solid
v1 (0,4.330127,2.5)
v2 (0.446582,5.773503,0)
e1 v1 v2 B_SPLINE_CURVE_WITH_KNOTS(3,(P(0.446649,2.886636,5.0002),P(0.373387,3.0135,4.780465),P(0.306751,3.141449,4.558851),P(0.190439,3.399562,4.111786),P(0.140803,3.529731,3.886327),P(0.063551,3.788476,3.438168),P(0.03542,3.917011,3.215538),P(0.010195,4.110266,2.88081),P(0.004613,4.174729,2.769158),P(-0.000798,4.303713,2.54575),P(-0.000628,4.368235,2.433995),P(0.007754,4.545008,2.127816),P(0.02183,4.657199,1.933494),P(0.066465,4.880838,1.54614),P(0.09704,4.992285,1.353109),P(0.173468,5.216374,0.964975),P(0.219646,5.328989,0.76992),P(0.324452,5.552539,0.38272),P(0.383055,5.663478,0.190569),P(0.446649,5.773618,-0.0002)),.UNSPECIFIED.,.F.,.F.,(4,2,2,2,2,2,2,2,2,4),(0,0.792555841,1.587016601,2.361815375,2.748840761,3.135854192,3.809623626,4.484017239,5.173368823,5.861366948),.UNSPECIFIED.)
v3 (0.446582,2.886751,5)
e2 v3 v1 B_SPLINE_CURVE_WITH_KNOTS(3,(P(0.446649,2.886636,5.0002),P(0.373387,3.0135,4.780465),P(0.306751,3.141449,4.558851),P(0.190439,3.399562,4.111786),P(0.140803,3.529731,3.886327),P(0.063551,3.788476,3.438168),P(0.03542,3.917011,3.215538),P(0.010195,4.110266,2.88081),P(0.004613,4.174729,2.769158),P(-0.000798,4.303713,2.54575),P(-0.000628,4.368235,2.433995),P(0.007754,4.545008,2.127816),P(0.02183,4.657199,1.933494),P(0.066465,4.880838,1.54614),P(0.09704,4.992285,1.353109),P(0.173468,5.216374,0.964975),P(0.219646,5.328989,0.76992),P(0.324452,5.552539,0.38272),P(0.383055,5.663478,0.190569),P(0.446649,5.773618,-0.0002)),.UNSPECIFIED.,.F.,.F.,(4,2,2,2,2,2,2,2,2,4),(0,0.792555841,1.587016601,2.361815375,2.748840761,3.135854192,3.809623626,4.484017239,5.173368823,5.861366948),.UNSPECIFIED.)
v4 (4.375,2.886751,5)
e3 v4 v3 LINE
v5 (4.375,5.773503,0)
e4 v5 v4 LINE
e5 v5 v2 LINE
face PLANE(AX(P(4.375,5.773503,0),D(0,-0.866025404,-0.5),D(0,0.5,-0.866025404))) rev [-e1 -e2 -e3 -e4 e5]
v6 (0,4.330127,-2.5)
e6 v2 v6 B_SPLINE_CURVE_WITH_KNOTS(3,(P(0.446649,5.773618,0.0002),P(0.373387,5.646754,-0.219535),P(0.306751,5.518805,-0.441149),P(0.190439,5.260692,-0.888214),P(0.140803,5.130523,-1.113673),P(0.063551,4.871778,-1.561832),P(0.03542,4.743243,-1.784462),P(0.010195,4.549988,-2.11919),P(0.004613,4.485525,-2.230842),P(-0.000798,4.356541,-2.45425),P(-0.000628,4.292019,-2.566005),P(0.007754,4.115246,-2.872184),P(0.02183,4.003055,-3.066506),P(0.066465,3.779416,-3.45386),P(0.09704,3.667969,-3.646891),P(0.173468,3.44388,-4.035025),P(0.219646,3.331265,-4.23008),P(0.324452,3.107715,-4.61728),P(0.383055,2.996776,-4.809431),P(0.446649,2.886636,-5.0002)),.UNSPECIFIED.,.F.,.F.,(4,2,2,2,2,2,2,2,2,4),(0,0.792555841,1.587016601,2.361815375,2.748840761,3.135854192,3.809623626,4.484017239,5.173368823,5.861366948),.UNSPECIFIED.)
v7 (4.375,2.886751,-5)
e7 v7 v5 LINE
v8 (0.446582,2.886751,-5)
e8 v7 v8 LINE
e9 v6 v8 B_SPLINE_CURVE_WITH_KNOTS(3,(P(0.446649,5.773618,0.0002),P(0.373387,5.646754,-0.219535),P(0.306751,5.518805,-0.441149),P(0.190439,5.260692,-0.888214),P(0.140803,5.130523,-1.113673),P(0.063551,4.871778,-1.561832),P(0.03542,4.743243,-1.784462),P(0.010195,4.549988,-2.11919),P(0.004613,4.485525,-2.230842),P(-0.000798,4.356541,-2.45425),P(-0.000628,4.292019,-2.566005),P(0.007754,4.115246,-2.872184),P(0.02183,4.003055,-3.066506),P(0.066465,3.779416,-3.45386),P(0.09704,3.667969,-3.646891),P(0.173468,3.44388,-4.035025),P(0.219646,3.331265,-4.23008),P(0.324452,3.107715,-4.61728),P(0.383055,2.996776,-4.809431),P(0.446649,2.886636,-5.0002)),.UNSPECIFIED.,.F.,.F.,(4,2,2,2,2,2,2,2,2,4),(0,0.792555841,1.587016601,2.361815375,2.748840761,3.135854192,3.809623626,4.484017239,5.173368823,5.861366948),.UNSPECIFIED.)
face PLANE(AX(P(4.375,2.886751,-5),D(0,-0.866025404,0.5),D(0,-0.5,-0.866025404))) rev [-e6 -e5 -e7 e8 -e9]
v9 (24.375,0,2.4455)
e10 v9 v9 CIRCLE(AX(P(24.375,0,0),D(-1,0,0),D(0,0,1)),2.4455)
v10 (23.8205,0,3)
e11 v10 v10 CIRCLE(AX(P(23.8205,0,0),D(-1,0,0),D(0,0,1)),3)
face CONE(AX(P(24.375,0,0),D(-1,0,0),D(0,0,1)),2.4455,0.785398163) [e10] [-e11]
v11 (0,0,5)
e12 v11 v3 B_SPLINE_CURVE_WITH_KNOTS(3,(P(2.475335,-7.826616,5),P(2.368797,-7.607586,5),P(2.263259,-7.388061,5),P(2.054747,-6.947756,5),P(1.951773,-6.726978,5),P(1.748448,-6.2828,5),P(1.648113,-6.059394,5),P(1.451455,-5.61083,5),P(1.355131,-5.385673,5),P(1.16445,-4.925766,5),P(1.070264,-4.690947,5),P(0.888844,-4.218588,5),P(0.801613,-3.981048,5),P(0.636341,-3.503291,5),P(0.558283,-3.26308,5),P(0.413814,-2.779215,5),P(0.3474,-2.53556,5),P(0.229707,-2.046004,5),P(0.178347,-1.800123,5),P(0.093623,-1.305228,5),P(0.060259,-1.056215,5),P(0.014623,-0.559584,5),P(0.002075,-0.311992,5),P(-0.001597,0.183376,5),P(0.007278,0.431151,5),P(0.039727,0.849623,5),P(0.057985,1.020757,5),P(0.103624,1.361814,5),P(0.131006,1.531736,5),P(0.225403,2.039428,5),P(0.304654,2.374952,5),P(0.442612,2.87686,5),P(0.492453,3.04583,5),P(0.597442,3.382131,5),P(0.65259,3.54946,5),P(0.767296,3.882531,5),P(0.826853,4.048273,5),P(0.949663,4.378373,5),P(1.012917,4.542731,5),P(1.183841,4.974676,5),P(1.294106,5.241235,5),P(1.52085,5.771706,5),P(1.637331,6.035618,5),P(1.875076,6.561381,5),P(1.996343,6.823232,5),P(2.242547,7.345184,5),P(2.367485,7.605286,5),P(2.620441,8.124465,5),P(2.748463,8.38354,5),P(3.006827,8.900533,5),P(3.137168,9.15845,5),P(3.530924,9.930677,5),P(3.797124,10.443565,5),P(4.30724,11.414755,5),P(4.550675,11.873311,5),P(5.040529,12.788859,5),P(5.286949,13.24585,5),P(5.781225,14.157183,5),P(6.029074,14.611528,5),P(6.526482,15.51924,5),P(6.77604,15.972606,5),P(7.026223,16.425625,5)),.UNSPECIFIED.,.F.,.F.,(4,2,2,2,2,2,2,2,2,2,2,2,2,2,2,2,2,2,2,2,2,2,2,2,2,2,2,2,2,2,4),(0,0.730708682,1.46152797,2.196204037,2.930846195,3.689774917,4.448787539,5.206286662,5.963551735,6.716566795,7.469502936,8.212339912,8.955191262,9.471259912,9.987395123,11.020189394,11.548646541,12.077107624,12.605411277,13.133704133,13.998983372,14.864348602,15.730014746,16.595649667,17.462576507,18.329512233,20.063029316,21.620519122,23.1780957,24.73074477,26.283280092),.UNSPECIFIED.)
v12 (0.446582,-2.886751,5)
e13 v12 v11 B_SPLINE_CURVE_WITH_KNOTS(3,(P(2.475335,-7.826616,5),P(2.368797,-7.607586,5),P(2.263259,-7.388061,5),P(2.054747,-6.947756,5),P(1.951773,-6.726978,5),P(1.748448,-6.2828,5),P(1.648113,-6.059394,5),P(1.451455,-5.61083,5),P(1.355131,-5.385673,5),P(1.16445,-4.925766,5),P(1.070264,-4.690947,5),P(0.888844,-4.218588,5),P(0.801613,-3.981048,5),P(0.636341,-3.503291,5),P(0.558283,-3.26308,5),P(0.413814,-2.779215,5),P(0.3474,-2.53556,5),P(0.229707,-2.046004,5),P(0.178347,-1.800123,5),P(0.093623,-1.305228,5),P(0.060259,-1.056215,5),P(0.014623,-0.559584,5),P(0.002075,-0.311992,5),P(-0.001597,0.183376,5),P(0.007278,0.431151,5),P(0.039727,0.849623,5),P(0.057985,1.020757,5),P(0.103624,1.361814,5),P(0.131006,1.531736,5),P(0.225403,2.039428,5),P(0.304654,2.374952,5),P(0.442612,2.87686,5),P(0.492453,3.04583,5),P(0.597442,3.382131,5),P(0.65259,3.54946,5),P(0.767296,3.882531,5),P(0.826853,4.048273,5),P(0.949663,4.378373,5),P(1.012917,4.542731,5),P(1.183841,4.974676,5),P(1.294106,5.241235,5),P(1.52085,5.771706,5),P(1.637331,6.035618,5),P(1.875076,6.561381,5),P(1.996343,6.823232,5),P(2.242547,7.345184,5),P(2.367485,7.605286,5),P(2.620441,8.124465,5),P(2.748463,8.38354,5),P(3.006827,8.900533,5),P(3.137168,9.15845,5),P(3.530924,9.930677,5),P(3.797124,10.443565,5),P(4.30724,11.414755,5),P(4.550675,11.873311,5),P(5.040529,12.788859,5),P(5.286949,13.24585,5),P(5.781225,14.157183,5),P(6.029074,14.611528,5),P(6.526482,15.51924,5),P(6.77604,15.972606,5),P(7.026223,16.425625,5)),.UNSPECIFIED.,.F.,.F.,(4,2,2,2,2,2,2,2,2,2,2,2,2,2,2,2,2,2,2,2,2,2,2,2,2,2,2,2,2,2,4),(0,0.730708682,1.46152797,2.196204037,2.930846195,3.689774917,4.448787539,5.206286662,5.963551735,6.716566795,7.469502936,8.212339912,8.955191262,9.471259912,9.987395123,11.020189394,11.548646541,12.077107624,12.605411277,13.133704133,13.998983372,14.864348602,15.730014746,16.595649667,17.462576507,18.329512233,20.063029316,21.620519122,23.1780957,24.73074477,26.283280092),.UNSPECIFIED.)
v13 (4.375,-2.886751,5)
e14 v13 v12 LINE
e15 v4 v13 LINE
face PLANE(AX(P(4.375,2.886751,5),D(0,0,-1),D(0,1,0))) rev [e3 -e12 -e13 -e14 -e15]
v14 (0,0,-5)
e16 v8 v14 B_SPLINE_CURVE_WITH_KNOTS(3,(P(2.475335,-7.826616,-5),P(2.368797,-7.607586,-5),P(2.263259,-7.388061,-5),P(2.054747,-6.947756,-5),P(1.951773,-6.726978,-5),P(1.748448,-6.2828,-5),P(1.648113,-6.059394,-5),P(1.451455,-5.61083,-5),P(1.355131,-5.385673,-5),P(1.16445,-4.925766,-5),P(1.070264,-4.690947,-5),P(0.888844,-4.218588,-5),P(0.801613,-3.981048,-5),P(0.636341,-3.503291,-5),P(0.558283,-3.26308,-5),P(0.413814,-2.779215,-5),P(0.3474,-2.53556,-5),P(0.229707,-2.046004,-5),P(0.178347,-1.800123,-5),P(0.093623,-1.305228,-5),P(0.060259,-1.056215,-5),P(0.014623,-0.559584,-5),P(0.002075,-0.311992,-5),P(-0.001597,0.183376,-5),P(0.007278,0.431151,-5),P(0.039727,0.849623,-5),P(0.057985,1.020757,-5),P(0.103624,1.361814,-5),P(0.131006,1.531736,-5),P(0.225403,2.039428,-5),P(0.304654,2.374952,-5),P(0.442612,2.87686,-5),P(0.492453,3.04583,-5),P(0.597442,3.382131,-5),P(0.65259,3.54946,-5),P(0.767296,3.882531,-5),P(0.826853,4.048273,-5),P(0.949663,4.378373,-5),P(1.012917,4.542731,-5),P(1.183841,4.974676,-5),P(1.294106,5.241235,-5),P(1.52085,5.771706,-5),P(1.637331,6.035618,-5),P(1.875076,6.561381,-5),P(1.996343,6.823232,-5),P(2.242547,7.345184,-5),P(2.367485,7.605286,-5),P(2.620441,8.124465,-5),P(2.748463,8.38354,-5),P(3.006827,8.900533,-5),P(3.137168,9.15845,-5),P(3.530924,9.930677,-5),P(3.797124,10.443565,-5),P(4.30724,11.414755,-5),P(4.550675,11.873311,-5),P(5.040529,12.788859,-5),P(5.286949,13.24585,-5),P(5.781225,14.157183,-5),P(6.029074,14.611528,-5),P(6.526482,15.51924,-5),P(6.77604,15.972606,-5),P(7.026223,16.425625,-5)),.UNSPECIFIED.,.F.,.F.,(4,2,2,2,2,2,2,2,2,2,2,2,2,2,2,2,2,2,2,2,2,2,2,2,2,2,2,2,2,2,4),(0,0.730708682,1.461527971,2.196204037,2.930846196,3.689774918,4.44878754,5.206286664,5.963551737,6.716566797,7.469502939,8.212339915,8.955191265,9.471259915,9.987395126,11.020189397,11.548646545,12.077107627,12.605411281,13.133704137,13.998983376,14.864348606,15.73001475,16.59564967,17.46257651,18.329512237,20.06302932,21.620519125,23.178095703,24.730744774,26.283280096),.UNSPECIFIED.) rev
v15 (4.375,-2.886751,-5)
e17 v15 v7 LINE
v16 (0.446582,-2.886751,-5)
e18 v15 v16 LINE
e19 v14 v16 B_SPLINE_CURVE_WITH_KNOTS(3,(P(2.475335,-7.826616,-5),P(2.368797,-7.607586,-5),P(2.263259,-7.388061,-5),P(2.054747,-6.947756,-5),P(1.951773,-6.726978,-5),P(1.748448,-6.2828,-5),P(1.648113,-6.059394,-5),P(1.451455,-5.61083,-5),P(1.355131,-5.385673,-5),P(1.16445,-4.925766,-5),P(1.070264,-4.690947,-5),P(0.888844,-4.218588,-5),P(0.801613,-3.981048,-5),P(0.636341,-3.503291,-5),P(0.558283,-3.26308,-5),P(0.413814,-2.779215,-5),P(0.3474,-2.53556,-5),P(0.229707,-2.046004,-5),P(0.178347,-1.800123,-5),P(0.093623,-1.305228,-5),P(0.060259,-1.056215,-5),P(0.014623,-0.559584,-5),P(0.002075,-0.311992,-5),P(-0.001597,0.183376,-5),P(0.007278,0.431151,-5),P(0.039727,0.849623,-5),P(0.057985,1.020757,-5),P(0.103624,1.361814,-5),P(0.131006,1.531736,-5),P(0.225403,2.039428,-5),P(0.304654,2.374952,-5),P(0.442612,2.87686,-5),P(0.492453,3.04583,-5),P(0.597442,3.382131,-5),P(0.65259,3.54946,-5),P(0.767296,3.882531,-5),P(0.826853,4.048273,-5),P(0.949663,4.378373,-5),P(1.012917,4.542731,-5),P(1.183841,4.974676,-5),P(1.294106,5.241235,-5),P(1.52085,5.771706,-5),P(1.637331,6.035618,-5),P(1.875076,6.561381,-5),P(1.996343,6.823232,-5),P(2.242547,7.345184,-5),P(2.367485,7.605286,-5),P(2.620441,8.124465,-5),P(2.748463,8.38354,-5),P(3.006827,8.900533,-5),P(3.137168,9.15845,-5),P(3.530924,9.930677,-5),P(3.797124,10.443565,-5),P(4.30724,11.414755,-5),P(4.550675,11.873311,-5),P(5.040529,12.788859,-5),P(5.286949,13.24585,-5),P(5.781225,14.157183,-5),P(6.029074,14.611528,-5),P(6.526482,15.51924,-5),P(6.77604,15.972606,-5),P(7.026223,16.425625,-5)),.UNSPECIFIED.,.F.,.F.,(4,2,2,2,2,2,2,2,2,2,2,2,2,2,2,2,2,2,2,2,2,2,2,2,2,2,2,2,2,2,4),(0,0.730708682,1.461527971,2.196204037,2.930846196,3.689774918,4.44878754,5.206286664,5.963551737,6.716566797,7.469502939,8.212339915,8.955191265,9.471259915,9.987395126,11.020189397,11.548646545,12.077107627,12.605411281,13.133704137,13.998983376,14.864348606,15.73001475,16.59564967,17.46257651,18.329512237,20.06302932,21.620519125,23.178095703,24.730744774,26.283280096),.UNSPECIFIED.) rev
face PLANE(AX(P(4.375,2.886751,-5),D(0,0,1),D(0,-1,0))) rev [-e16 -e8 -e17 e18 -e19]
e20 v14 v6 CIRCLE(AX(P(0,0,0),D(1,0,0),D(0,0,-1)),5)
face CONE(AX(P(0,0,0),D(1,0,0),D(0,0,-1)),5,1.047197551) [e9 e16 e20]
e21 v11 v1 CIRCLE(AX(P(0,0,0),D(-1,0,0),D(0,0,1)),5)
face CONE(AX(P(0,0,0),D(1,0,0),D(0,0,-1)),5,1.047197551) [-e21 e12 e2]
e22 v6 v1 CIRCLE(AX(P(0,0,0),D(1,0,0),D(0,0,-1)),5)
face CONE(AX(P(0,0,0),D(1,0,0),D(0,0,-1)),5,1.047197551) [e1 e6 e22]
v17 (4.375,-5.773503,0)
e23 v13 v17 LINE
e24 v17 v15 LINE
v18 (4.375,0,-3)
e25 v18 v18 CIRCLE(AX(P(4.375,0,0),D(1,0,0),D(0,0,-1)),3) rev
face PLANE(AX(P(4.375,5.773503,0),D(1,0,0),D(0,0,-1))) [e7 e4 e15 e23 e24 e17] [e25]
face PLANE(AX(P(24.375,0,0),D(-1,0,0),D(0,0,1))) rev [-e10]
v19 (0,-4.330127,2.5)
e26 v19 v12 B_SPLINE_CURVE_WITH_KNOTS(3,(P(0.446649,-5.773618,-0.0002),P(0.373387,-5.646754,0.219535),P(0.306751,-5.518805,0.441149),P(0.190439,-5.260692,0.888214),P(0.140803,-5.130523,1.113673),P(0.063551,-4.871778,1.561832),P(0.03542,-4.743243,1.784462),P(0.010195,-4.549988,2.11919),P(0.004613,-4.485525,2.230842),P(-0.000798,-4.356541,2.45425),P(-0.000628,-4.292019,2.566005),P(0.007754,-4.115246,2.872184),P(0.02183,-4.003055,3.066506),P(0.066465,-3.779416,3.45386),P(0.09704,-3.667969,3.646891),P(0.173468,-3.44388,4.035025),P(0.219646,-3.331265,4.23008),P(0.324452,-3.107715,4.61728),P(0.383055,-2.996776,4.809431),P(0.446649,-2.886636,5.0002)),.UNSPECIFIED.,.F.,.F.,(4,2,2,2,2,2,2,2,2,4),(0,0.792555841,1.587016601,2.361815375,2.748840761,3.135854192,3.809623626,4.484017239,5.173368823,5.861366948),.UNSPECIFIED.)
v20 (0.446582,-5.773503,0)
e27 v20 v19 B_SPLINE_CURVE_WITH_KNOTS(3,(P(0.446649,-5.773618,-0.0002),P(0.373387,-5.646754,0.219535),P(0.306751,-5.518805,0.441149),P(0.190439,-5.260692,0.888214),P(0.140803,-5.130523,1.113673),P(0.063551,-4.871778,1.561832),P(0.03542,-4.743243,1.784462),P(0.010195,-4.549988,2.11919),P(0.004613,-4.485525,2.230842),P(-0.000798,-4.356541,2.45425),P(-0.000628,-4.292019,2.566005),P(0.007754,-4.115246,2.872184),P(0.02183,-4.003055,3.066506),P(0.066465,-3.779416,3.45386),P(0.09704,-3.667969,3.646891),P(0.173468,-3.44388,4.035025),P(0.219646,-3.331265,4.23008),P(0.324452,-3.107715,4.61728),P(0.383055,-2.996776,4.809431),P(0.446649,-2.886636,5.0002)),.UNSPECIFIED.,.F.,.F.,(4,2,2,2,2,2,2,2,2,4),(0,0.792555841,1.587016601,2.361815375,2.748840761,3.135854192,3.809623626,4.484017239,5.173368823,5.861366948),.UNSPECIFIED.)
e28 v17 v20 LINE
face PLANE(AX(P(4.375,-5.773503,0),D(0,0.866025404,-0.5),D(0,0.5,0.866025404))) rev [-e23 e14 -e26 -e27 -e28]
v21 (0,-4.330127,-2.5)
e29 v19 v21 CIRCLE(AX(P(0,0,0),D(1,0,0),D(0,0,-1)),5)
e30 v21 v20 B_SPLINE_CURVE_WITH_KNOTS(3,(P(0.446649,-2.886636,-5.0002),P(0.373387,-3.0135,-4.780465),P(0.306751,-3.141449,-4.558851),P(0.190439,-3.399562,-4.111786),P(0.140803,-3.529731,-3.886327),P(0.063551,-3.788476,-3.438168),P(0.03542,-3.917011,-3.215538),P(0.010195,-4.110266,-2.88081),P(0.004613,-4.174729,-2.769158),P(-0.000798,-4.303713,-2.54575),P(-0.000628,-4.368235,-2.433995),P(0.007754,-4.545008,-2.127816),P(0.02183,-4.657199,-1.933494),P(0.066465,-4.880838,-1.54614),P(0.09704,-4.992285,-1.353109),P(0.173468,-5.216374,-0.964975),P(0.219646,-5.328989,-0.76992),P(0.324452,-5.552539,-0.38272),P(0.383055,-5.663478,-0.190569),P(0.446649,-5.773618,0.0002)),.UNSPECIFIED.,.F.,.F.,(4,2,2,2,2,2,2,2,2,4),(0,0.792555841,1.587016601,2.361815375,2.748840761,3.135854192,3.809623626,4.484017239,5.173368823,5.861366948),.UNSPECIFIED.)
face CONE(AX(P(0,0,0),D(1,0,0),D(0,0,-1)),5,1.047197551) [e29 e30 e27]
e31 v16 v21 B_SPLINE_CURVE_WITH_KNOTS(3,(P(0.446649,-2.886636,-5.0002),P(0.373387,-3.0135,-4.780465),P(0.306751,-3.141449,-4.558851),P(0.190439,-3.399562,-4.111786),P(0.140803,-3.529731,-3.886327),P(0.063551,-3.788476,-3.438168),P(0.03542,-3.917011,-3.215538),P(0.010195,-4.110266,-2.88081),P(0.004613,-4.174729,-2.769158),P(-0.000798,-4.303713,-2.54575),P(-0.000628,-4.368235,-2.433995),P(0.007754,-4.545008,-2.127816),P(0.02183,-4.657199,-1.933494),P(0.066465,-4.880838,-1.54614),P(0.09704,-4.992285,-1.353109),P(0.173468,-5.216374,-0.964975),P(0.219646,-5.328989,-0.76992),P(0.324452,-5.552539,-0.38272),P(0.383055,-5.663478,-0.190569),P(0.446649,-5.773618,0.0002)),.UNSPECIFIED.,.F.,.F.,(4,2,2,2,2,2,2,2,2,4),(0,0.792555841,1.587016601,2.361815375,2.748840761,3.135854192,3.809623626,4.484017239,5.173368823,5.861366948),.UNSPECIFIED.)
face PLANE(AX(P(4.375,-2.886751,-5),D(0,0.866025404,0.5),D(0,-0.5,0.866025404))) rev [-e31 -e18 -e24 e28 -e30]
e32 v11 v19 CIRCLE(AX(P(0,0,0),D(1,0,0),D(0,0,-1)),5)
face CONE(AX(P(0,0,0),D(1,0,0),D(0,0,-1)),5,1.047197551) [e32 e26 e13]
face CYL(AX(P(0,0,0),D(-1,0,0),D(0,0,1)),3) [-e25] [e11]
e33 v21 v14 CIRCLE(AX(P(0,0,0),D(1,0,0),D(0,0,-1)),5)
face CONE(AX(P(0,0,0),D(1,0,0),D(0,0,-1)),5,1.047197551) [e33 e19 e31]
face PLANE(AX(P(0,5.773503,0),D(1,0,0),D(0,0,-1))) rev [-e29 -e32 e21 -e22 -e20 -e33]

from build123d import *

# Parameters (mm, degrees)
BASEHEAD_DEPTH = 4.375


# Read off the part's stored shape, not the designer's step: HeadChamfer
with BuildPart() as part:
    # Sketch1 → BaseHead (new body)
    with BuildSketch(Plane(origin=(0, 0, 0), x_dir=(0, 0, -1), z_dir=(1, 0, 0))):
        Polygon((5, 2.886751346), (5, -2.886751346), (0, -5.773502692), (-5, -2.886751346), (-5, 2.886751346), (0, 5.773502692), align=None)
    extrude(amount=BASEHEAD_DEPTH)

    # HeadChamfer outline → HeadChamfer (revolve, cut)
    with BuildSketch(Plane.YX):
        Polygon((5.773502688, 0.446581985), (4.999998827, -6.77e-07), (5.773502692, -8.45e-07), align=None)
    revolve(axis=Axis((0, 0, 0), (1, 0, 0)), mode=Mode.SUBTRACT)

    # HeadChamfer 2 outline → HeadChamfer 2 (revolve)
    with BuildSketch(Plane.YX):
        Polygon((3, 4.375), (3, 23.8205), (2.4455, 24.375), (0, 24.375), (0, 4.375), align=None)
    revolve(axis=Axis((0, 0, 0), (1, 0, 0)))


solid = part.part
